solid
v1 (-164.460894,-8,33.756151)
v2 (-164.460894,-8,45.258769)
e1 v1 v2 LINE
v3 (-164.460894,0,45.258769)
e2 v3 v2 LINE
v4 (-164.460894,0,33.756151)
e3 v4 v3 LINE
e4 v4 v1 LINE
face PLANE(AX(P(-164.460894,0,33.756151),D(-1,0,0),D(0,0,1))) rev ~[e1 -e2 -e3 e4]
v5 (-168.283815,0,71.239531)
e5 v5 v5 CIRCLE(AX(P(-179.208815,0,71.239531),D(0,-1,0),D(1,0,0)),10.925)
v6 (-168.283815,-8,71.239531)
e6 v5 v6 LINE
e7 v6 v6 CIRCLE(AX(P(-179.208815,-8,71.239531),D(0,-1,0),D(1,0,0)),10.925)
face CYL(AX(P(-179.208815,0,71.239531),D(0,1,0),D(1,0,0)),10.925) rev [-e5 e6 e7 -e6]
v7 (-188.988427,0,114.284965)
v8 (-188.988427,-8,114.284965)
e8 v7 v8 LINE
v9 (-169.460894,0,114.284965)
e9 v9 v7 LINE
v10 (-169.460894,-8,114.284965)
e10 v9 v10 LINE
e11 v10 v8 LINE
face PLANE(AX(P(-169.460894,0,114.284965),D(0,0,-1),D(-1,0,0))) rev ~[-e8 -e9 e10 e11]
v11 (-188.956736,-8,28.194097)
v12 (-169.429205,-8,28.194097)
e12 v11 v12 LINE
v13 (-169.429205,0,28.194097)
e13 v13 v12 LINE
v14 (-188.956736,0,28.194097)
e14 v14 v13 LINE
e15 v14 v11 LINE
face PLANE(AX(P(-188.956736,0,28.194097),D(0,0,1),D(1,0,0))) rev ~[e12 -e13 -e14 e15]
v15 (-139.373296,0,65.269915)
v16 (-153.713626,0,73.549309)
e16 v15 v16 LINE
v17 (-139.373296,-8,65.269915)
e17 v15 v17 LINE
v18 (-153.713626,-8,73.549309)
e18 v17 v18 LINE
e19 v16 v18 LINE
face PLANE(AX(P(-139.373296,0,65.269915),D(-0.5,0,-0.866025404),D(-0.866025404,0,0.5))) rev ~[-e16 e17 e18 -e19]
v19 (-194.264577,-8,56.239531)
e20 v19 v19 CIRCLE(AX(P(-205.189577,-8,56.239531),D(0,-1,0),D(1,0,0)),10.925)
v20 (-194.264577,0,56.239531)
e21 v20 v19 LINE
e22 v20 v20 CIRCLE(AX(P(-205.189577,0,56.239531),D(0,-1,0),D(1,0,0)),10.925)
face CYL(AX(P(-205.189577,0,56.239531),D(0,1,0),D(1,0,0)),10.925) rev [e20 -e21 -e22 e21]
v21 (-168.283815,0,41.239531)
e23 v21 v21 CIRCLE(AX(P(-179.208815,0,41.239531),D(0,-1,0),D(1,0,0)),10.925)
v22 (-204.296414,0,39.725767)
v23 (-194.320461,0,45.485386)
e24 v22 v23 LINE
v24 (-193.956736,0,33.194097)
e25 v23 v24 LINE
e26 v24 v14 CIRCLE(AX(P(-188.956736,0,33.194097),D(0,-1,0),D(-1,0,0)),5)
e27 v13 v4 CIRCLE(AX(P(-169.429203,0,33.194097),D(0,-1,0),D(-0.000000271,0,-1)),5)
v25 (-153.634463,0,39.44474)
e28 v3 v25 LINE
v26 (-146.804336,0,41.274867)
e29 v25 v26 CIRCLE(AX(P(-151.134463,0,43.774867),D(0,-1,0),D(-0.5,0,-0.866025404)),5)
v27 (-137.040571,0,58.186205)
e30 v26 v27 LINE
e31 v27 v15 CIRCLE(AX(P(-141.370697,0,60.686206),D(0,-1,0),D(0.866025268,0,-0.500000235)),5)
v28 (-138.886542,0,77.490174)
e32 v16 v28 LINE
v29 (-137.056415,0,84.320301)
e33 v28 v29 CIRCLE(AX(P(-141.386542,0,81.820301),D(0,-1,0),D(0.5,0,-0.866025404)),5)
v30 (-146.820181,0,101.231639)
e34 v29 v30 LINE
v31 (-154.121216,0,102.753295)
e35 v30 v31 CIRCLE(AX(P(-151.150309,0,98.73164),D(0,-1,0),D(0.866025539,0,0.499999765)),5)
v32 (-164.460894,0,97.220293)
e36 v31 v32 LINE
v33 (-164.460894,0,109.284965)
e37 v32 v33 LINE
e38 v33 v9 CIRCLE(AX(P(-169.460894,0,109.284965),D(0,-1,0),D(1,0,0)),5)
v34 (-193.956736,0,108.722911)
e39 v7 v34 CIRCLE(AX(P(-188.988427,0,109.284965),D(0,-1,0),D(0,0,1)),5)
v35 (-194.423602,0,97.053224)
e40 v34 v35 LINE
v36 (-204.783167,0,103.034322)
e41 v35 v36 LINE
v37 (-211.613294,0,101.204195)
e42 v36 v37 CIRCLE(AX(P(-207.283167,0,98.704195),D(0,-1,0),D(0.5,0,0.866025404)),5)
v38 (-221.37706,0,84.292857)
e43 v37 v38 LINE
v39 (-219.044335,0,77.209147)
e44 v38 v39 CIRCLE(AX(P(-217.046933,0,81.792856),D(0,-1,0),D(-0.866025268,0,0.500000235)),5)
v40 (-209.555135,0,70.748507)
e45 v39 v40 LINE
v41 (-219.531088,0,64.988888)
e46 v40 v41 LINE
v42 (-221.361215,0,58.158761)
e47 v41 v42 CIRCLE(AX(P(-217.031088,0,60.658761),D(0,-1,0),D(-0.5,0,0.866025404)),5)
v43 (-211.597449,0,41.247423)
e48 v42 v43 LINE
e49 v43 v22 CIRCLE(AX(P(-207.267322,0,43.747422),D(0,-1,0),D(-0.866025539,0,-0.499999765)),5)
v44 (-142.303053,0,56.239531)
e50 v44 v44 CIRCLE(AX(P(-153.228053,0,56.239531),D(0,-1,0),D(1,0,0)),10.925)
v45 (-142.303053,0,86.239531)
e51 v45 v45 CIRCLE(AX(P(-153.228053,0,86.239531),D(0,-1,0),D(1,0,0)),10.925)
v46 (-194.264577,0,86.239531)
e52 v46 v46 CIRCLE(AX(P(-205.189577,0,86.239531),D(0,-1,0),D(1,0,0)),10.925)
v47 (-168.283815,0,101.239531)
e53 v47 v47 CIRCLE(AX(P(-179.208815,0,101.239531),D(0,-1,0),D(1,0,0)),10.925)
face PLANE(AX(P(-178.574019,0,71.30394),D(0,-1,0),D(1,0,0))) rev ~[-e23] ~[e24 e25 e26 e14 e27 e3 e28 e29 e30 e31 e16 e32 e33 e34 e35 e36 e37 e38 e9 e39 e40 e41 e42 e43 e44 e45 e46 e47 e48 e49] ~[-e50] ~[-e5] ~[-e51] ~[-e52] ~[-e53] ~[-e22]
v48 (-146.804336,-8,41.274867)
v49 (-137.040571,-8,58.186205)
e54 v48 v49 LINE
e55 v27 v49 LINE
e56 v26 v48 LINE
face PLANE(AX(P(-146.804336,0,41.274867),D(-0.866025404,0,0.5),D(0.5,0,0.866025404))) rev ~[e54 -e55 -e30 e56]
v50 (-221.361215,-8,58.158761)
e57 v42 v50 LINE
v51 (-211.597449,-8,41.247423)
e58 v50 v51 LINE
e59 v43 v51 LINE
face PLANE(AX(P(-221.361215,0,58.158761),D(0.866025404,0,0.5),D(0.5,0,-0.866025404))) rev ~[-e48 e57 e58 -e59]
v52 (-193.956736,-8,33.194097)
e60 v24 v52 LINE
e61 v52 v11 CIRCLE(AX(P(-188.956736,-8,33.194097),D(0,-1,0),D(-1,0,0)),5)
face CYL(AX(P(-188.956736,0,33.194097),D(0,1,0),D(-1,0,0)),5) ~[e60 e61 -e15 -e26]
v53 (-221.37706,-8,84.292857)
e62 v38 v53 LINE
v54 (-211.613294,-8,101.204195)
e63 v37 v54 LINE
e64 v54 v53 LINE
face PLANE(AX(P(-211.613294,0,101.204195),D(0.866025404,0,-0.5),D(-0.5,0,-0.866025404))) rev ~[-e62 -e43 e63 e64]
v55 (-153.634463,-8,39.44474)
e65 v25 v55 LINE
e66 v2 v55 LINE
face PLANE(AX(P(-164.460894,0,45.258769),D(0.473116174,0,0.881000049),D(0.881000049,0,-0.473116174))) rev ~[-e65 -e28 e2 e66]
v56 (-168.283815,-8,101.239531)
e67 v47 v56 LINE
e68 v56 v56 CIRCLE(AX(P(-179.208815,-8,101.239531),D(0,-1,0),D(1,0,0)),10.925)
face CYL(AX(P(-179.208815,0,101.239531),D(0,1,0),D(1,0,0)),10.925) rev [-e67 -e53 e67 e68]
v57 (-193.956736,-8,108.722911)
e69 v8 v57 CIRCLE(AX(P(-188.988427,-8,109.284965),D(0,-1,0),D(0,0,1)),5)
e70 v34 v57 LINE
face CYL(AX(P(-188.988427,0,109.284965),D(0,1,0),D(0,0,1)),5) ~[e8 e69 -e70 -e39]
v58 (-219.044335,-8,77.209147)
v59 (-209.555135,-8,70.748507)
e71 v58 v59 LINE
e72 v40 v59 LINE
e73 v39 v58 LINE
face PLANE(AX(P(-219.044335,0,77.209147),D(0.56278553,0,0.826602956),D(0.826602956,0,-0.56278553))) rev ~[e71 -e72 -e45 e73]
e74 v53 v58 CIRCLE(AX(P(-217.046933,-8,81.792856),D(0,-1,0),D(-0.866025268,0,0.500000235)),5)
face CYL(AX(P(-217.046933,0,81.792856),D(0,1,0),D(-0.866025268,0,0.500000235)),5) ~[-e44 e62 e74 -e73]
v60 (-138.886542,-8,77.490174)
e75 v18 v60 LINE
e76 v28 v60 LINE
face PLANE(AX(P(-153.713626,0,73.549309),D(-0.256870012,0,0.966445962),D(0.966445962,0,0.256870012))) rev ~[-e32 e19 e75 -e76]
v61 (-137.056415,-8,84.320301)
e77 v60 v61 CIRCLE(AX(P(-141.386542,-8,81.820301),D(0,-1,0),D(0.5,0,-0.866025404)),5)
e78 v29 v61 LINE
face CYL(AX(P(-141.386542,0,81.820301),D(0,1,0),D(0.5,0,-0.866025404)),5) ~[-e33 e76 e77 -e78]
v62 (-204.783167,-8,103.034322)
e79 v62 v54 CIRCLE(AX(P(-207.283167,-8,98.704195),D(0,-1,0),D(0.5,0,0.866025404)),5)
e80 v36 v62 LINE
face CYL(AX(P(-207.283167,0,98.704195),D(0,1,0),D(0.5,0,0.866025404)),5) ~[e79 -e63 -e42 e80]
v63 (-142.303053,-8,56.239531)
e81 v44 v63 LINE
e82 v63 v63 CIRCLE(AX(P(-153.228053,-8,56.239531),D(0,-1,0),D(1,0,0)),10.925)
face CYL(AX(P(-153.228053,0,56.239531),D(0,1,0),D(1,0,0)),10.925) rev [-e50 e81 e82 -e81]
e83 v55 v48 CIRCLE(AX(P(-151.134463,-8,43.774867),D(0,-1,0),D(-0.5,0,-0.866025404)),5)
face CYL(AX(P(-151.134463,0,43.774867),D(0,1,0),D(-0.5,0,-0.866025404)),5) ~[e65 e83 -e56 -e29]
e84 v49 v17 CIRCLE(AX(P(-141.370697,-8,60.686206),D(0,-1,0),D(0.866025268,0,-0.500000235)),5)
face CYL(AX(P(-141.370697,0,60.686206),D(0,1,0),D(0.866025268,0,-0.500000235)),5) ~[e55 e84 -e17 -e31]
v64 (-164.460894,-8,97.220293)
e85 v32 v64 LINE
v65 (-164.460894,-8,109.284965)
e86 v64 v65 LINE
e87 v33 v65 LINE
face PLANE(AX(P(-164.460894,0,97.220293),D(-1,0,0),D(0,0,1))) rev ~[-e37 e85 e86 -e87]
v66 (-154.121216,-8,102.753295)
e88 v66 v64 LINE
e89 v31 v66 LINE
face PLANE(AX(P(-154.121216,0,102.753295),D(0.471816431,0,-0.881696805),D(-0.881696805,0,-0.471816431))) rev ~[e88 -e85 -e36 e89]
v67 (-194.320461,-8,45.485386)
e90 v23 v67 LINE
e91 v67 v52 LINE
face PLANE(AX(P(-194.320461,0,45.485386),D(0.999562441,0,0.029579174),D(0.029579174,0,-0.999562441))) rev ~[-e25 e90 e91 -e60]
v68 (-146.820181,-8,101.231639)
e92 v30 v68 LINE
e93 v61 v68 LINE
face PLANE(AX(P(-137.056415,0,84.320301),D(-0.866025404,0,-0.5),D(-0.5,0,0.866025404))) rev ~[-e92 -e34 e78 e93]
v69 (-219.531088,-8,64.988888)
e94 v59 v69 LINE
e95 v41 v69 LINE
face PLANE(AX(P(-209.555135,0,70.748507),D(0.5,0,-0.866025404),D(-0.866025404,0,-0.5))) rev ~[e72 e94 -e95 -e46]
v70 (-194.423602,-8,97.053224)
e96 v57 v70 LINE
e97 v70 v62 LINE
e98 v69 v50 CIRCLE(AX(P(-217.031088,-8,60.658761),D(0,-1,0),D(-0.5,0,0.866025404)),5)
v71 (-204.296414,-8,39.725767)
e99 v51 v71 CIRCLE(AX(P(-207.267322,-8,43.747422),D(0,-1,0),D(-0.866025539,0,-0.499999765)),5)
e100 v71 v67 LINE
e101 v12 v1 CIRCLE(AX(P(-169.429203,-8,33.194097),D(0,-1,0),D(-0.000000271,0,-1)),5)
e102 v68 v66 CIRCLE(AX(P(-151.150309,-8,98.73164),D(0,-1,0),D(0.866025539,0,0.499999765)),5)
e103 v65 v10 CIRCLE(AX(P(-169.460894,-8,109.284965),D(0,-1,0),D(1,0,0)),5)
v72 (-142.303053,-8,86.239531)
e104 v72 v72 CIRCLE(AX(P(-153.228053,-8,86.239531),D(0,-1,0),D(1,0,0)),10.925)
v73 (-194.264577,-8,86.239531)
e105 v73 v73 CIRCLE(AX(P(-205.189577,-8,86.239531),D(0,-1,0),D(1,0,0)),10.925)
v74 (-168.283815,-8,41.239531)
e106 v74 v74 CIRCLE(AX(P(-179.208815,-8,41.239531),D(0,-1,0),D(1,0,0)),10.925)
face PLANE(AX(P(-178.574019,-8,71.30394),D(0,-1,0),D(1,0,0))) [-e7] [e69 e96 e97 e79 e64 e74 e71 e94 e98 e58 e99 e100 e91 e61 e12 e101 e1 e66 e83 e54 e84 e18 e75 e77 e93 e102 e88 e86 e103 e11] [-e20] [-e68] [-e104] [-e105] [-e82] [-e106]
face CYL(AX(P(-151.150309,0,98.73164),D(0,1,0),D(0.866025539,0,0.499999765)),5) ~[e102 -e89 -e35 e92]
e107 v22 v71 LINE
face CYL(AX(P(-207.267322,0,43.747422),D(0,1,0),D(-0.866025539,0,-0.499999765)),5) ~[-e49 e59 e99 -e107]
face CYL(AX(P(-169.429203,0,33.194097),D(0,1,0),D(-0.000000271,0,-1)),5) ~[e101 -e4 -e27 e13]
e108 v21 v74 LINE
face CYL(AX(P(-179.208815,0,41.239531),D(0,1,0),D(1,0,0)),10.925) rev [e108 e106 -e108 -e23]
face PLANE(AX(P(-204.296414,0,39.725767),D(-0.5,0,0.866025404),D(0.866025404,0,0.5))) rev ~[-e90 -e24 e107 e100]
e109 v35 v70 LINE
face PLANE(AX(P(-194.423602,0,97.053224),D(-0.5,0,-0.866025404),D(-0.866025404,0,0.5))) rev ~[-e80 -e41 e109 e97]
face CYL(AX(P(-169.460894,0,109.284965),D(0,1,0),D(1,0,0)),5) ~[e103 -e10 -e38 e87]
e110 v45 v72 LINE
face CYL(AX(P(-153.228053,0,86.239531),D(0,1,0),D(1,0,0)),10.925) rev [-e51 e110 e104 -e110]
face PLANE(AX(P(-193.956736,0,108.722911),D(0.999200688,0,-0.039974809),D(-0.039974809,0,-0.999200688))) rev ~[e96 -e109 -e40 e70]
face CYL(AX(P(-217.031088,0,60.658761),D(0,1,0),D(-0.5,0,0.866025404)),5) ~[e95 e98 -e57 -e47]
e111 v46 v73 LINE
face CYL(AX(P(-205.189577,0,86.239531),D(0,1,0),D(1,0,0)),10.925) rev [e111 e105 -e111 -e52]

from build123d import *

# Parameters (mm, degrees)
F0_R     = 10.925
F1_DEPTH = 8


# Not quite as in the source:
# - a feature names something its author has since deleted; it is built from what else it names


with BuildPart() as f1:
    # F0 (on Front) → F1 (new body)
    with BuildSketch(Plane.XZ):
        with BuildLine():
            ThreePointArc((-164.4608943756, 109.2849649489), (-165.9253604697, 112.8204988548), (-169.4608943756, 114.2849649489))
            Line((-169.4608943756, 114.2849649489), (-188.9884267566, 114.2849649489))
            ThreePointArc((-188.9884267566, 114.2849649489), (-192.7173858315, 112.6158603567), (-193.95673582, 108.7229106361))
            Line((-193.95673582, 108.7229106361), (-194.4236024673, 97.0532244981))
            Line((-194.4236024673, 97.0532244981), (-204.7831671065, 103.0343219313))
            ThreePointArc((-204.7831671065, 103.0343219313), (-208.577262332, 103.5338240438), (-211.6132941254, 101.2041949124))
            Line((-211.6132941254, 101.2041949123), (-221.3770596376, 84.2928569721))
            ThreePointArc((-221.3770596376, 84.2928569721), (-221.7960530872, 80.2289308569), (-219.0443345156, 77.209146778))
            Line((-219.0443345156, 77.209146778), (-209.5551351868, 70.7485068424))
            Line((-209.5551351868, 70.7485068424), (-219.5310878287, 64.9888878992))
            ThreePointArc((-219.5310878287, 64.9888878992), (-221.8607169602, 61.9528561057), (-221.3612148477, 58.1587608802))
            Line((-221.3612148477, 58.1587608802), (-211.5974493355, 41.24742294))
            ThreePointArc((-211.5974493355, 41.24742294), (-208.2874828054, 38.852600911), (-204.2964137934, 39.7257670587))
            Line((-204.2964137934, 39.7257670587), (-194.3204611514, 45.4853860019))
            Line((-194.3204611514, 45.4853860019), (-193.95673582, 33.1940968847))
            ThreePointArc((-193.95673582, 33.1940968847), (-192.492269726, 29.6585629787), (-188.95673582, 28.1940968847))
            Line((-188.95673582, 28.1940968847), (-169.4292047957, 28.1940968847))
            ThreePointArc((-169.4292047957, 28.1940968847), (-165.7002448161, 29.8632009709), (-164.4608943756, 33.7561511974))
            Line((-164.4608943756, 33.7561511974), (-164.4608943756, 45.2587688032))
            Line((-164.4608943756, 45.2587688032), (-153.6344630891, 39.4447399023))
            ThreePointArc((-153.6344630891, 39.4447399023), (-149.8403678636, 38.9452377897), (-146.8043360702, 41.2748669212))
            Line((-146.8043360702, 41.2748669212), (-137.040570558, 58.1862048614))
            ThreePointArc((-137.040570558, 58.1862048614), (-136.6215771084, 62.2501309766), (-139.37329568, 65.2699150555))
            Line((-139.37329568, 65.2699150555), (-153.7136262629, 73.5493087778))
            Line((-153.7136262629, 73.5493087778), (-138.8865423669, 77.4901739344))
            ThreePointArc((-138.8865423669, 77.4901739344), (-136.5569132354, 80.5262057278), (-137.056415348, 84.3203009533))
            Line((-137.056415348, 84.3203009533), (-146.8201808601, 101.2316388936))
            ThreePointArc((-146.8201808601, 101.2316388936), (-150.1301473902, 103.6264609225), (-154.1212164023, 102.7532947749))
            Line((-154.1212164023, 102.7532947749), (-164.4608943756, 97.2202930303))
            Line((-164.4608943756, 97.2202930303), (-164.4608943756, 109.2849649489))
        make_face()
        with Locations((-179.2088150978, 41.2395309168)):
            Circle(F0_R, mode=Mode.SUBTRACT)
        with Locations((-205.1895772113, 56.2395309168)):
            Circle(F0_R, mode=Mode.SUBTRACT)
        with Locations((-153.2280529843, 56.2395309168)):
            Circle(F0_R, mode=Mode.SUBTRACT)
        with Locations((-205.1895772113, 86.2395309168)):
            Circle(F0_R, mode=Mode.SUBTRACT)
        with Locations((-179.2088150978, 71.2395309168)):
            Circle(F0_R, mode=Mode.SUBTRACT)
        with Locations((-179.2088150978, 101.2395309168)):
            Circle(F0_R, mode=Mode.SUBTRACT)
        with Locations((-153.2280529843, 86.2395309168)):
            Circle(F0_R, mode=Mode.SUBTRACT)
    extrude(amount=F1_DEPTH)


solid = f1.part
